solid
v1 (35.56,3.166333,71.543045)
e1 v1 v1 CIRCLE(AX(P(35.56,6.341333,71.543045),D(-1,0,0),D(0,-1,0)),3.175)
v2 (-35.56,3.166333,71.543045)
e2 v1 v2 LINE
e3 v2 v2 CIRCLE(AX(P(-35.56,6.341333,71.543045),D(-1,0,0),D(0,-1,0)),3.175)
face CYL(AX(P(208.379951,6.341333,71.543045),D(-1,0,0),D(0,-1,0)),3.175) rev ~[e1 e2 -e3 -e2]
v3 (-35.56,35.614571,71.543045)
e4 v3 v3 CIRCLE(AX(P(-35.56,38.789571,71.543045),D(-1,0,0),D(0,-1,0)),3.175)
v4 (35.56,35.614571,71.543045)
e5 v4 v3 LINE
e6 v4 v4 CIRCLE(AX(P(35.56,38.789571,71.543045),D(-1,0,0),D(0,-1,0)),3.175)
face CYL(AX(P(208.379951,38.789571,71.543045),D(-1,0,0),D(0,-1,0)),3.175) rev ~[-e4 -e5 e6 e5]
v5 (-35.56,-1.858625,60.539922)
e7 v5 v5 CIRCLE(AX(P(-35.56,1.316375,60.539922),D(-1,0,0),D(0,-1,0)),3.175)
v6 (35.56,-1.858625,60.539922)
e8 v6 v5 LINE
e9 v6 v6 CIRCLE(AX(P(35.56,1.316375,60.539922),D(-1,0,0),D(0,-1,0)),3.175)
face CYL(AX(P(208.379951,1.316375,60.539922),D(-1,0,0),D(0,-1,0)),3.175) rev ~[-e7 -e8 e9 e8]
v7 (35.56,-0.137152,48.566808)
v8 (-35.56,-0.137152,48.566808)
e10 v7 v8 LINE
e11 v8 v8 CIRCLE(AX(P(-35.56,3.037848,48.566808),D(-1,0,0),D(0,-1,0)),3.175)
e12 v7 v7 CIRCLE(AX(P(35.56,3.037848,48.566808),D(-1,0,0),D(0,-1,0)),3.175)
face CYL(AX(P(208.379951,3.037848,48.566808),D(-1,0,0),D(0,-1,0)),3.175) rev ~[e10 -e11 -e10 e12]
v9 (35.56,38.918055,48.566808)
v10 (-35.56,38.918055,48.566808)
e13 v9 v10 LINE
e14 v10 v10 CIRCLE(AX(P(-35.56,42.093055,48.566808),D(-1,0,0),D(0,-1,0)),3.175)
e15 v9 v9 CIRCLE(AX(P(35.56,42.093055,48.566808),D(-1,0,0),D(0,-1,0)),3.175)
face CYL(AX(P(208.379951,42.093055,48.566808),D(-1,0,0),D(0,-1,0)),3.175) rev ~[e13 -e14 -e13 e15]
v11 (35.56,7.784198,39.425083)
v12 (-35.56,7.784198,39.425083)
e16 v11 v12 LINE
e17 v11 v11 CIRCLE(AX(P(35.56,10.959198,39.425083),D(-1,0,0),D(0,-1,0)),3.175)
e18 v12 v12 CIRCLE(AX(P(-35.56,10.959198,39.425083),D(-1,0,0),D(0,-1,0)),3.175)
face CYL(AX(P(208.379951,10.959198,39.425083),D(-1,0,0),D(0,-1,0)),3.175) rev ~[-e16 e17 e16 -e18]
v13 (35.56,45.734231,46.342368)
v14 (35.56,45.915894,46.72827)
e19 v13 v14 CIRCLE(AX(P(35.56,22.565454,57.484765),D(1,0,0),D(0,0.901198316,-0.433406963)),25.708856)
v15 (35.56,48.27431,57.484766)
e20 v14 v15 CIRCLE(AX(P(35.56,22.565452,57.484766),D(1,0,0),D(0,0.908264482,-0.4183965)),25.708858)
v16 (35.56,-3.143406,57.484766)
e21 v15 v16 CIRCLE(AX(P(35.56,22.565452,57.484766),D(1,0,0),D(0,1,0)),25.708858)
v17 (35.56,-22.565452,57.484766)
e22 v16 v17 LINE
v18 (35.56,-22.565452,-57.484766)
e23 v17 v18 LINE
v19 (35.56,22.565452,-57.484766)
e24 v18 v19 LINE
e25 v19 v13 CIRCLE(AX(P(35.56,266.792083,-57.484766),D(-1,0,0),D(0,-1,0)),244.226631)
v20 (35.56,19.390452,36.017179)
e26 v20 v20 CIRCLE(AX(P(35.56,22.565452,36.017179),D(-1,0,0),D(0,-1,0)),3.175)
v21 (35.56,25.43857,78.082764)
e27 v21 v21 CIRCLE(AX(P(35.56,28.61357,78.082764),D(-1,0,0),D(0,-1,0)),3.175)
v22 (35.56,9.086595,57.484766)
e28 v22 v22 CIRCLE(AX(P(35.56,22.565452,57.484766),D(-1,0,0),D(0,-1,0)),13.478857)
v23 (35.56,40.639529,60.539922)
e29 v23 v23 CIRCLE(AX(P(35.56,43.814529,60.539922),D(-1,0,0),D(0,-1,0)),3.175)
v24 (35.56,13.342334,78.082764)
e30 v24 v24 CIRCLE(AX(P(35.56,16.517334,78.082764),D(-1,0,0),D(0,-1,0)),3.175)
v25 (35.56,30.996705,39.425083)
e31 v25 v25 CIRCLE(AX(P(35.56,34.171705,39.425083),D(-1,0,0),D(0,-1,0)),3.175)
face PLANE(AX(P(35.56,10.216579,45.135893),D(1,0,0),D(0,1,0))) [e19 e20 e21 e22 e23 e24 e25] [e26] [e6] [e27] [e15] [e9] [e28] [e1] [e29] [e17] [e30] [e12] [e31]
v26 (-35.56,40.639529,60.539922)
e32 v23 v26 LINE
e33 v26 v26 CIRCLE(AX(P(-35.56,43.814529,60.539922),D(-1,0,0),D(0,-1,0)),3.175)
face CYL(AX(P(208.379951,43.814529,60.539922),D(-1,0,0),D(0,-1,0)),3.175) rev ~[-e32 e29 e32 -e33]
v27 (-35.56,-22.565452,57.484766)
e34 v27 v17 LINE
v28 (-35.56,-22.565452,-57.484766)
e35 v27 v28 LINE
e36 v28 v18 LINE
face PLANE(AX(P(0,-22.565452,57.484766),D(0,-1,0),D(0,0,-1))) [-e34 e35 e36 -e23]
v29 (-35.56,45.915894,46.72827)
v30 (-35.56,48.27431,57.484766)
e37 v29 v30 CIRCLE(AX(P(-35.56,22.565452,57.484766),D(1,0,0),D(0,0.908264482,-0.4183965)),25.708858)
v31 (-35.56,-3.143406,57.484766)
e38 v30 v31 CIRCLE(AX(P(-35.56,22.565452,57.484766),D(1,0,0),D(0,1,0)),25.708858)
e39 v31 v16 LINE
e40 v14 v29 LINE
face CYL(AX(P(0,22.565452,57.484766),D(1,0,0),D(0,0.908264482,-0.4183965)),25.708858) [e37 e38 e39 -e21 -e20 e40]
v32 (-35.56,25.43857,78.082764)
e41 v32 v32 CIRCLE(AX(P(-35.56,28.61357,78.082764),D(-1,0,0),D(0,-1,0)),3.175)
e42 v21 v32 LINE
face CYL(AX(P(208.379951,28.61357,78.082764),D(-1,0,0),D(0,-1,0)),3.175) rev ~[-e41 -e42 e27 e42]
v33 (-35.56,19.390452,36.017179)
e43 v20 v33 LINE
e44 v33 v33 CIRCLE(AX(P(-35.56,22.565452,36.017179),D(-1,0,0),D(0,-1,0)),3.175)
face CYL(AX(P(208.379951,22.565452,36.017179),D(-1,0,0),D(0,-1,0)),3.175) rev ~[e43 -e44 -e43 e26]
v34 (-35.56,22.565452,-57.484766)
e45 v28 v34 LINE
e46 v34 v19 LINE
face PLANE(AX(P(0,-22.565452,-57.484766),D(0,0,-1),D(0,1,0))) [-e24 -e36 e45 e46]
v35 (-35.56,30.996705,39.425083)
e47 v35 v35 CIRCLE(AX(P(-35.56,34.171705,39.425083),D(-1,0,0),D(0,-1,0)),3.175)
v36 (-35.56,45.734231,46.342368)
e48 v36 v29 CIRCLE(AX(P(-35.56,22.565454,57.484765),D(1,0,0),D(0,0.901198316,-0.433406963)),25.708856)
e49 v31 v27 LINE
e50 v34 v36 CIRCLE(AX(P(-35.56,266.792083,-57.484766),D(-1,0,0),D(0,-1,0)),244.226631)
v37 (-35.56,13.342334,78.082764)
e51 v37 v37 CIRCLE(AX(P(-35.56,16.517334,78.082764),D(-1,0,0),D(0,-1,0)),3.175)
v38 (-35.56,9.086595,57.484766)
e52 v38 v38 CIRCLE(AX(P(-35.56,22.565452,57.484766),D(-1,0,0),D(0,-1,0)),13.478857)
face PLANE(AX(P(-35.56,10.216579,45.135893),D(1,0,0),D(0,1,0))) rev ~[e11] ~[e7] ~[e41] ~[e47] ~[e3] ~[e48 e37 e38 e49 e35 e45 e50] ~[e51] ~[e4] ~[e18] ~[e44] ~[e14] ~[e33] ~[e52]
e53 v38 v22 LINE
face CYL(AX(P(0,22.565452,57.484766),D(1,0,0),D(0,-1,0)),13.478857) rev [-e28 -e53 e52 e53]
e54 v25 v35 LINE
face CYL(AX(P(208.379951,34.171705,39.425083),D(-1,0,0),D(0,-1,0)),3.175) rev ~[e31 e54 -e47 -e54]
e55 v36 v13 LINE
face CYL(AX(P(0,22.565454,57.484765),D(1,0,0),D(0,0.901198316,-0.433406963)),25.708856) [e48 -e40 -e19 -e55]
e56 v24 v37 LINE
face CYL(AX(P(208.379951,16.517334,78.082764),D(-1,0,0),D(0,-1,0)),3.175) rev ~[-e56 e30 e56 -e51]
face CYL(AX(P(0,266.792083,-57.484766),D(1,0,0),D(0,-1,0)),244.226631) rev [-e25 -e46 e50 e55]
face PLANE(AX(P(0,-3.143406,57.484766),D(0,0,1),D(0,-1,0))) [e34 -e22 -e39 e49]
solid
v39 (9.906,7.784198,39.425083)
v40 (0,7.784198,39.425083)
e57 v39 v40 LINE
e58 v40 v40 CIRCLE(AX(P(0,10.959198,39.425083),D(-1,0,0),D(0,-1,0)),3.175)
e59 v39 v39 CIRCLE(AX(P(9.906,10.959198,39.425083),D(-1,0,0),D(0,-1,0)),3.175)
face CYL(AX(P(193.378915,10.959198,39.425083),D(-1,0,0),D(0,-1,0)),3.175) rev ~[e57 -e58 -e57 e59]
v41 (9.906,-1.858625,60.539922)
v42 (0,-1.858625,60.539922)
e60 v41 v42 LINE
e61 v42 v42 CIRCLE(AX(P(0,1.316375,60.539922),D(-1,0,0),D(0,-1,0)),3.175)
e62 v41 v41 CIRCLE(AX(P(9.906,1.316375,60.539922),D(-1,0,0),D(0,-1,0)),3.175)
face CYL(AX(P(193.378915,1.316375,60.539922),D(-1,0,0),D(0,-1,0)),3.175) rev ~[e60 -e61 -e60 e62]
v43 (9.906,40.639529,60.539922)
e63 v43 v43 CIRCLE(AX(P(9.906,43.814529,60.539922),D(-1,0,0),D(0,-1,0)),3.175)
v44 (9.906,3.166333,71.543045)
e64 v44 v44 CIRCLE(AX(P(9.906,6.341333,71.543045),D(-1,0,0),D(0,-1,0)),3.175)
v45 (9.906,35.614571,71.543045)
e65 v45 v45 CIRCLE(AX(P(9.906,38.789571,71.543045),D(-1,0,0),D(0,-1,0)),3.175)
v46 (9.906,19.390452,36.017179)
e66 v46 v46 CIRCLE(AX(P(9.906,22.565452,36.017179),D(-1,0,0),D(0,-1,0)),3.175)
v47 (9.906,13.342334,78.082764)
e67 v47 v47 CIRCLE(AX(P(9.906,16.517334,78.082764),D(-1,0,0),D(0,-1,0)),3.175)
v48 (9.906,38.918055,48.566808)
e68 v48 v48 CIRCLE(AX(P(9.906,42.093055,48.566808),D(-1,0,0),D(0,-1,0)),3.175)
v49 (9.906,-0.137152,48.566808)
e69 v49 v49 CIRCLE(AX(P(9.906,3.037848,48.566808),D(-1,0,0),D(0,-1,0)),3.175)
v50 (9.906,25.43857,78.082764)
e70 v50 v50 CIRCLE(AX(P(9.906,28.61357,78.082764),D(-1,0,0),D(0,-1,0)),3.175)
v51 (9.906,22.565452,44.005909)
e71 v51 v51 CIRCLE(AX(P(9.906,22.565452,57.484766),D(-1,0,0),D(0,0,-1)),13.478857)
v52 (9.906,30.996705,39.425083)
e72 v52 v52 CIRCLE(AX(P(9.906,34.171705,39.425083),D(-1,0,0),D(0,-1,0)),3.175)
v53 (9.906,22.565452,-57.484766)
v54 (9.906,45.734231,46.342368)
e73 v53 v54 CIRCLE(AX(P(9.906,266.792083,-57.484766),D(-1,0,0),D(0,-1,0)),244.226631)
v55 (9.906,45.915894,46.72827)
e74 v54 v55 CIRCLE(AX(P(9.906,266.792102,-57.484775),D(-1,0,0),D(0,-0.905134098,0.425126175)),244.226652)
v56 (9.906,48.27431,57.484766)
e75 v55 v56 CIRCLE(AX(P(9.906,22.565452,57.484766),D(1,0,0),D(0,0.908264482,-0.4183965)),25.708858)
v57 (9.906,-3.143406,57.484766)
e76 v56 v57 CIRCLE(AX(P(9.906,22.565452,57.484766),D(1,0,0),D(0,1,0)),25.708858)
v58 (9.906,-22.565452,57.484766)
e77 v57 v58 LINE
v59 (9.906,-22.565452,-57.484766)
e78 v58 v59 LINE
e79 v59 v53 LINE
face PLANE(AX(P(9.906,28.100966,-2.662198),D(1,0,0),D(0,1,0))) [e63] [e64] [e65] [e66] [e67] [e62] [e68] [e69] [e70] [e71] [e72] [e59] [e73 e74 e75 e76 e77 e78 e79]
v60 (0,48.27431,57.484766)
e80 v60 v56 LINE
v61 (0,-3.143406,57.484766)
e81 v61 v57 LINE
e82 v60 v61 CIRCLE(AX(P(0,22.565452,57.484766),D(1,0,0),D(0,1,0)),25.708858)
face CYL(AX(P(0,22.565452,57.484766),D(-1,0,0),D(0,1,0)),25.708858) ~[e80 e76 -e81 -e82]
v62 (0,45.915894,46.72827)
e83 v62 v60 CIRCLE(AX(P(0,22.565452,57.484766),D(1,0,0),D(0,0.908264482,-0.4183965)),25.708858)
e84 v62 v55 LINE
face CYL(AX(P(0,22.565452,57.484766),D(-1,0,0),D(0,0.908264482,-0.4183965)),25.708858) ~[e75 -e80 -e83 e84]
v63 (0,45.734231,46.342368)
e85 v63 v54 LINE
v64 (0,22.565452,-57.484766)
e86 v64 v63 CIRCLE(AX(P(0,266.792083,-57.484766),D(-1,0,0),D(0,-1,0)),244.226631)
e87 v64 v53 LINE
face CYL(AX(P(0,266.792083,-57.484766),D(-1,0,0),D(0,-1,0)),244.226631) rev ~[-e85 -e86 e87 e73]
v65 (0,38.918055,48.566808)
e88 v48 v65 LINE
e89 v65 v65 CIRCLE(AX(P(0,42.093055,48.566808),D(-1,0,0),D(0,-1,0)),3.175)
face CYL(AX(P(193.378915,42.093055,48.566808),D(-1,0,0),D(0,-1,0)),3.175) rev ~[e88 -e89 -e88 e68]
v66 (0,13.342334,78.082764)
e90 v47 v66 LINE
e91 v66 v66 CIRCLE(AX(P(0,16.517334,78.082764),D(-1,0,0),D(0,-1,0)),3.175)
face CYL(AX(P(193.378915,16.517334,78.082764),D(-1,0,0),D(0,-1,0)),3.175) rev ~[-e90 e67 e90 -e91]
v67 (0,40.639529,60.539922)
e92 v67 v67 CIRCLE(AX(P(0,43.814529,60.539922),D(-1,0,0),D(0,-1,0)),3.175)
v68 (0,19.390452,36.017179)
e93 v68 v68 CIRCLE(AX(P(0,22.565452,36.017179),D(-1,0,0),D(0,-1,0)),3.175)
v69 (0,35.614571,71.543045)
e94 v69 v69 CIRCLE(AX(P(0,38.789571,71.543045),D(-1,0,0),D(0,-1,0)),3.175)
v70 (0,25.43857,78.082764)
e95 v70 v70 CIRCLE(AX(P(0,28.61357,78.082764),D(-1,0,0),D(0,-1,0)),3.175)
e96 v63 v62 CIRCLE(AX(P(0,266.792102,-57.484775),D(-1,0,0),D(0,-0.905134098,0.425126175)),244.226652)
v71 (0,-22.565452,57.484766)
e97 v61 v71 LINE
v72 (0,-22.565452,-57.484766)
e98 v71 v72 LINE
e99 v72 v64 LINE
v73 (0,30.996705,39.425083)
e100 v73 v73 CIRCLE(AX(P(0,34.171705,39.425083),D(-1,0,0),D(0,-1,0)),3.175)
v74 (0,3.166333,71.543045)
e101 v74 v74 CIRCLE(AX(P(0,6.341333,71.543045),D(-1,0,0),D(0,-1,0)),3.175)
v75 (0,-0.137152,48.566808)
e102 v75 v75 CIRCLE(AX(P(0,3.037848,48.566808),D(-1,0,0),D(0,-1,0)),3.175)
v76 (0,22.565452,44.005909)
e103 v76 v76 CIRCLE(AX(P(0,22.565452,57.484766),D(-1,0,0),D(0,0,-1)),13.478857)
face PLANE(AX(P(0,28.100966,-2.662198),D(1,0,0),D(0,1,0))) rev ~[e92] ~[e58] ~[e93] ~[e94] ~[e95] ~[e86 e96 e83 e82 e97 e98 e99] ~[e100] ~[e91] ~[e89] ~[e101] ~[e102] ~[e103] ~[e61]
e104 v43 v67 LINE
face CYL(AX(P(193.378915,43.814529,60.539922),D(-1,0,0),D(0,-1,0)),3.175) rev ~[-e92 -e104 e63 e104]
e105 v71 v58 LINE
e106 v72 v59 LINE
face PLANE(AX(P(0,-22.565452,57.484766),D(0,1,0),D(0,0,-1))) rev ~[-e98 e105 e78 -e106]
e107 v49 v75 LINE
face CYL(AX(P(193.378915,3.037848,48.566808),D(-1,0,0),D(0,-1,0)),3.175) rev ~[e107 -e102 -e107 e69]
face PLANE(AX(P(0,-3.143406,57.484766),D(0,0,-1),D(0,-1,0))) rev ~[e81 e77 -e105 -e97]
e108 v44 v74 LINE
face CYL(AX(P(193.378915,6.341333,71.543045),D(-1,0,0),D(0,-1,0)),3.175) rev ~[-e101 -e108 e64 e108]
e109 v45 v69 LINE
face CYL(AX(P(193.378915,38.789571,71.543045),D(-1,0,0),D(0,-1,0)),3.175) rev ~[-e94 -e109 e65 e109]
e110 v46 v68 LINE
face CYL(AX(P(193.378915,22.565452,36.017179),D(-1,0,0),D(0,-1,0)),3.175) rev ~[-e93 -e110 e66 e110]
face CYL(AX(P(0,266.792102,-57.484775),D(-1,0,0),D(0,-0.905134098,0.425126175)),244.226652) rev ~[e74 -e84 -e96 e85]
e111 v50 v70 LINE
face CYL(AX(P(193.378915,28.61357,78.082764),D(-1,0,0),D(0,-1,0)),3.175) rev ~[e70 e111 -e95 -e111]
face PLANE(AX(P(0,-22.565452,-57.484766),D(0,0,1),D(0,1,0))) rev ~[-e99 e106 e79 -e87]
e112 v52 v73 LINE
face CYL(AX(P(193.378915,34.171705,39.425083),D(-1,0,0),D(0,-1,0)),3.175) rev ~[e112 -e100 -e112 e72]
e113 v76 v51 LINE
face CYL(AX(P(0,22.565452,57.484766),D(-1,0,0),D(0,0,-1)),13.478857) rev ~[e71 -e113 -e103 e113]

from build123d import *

# Parameters (mm, degrees)
F1_DEPTH = 9.906
F2_DEPTH = 35.56
F4_D     = 6.35
F4_2_D   = 6.35


# Not quite as in the source:
# - a feature of the source that left no trace in its solid (it failed there, or was rolled back) is left out


with BuildPart() as f1:
    # F0 (on Right) → F1 (new body)
    with BuildSketch(Plane.YZ):
        with BuildLine():
            ThreePointArc((45.734231444, 46.3423677323), (36.2491474566, 35.7200728964), (22.5654517973, 31.7759077207))
            Line((22.5654517973, 31.7759077207), (22.5654517973, -57.4847658439))
            ThreePointArc((22.5654517973, -57.4847658439), (28.4280108592, -4.2943860347), (45.734231444, 46.3423677323))
        make_face()
        with BuildLine():
            Line((-3.1434063259, 57.4847658439), (9.0865948156, 57.4847658439))
            ThreePointArc((9.0865948156, 57.4847658439), (22.5654517973, 70.9636228256), (36.044308779, 57.4847658439))
            ThreePointArc((36.044308779, 57.4847658439), (32.0964429717, 47.9537746695), (22.5654517973, 44.0059088622))
            Line((22.5654517973, 44.0059088622), (22.5654517973, 31.7759077207))
            ThreePointArc((22.5654517973, 31.7759077207), (36.2491474566, 35.7200728964), (45.734231444, 46.3423677323))
            ThreePointArc((45.734231444, 46.3423677323), (45.8249787247, 46.5353583121), (45.9158944923, 46.7282695768))
            ThreePointArc((45.9158944923, 46.7282695768), (47.6777854638, 51.9787615014), (48.2743099204, 57.4847658439))
            ThreePointArc((48.2743099204, 57.4847658439), (22.5654517973, 83.193623967), (-3.1434063259, 57.4847658439))
        make_face()
        with BuildLine():
            ThreePointArc((22.5654517973, 44.0059088622), (13.0344606229, 47.9537746695), (9.0865948156, 57.4847658439))
            Line((9.0865948156, 57.4847658439), (-3.1434063259, 57.4847658439))
            ThreePointArc((-3.1434063259, 57.4847658439), (4.3865438818, 39.3058579284), (22.5654517973, 31.7759077207))
            Line((22.5654517973, 31.7759077207), (22.5654517973, 44.0059088622))
        make_face()
        with BuildLine():
            ThreePointArc((22.5654517973, 31.7759077207), (4.3865438818, 39.3058579284), (-3.1434063259, 57.4847658439))
            Line((-3.1434063259, 57.4847658439), (-22.5654517973, 57.4847658439))
            Line((-22.5654517973, 57.4847658439), (-22.5654517973, -57.4847658439))
            Line((-22.5654517973, -57.4847658439), (22.5654517973, -57.4847658439))
            Line((22.5654517973, -57.4847658439), (22.5654517973, 31.7759077207))
        make_face()
    extrude(amount=F1_DEPTH)

    # F4 (through all)
    with Locations(Plane.YZ.offset(35.56)):
        with Locations((38.7895710473, 71.5430452002), (43.8145290766, 60.5399219241), (42.0930552086, 48.5668081792), (22.5654517973, 36.0171794891), (10.9591983617, 39.4250829816), (34.1717052329, 39.4250829816), (3.037848386, 48.5668081792), (1.3163745179, 60.5399219241), (6.3413325473, 71.5430452002), (16.5173338044, 78.0827641117), (28.6135697902, 78.0827641117)):
            Hole(F4_D / 2)


with BuildPart() as f2:
    # F0 (on Right) → F2 (new body, symmetric)
    with BuildSketch(Plane.YZ):
        with BuildLine():
            ThreePointArc((22.5654517973, 44.0059088622), (13.0344606229, 47.9537746695), (9.0865948156, 57.4847658439))
            Line((9.0865948156, 57.4847658439), (-3.1434063259, 57.4847658439))
            ThreePointArc((-3.1434063259, 57.4847658439), (4.3865438818, 39.3058579284), (22.5654517973, 31.7759077207))
            Line((22.5654517973, 31.7759077207), (22.5654517973, 44.0059088622))
        make_face()
        with BuildLine():
            Line((-3.1434063259, 57.4847658439), (9.0865948156, 57.4847658439))
            ThreePointArc((9.0865948156, 57.4847658439), (22.5654517973, 70.9636228256), (36.044308779, 57.4847658439))
            ThreePointArc((36.044308779, 57.4847658439), (32.0964429717, 47.9537746695), (22.5654517973, 44.0059088622))
            Line((22.5654517973, 44.0059088622), (22.5654517973, 31.7759077207))
            ThreePointArc((22.5654517973, 31.7759077207), (36.2491474566, 35.7200728964), (45.734231444, 46.3423677323))
            ThreePointArc((45.734231444, 46.3423677323), (45.8249787247, 46.5353583121), (45.9158944923, 46.7282695768))
            ThreePointArc((45.9158944923, 46.7282695768), (47.6777854638, 51.9787615014), (48.2743099204, 57.4847658439))
            ThreePointArc((48.2743099204, 57.4847658439), (22.5654517973, 83.193623967), (-3.1434063259, 57.4847658439))
        make_face()
        with BuildLine():
            ThreePointArc((22.5654517973, 31.7759077207), (4.3865438818, 39.3058579284), (-3.1434063259, 57.4847658439))
            Line((-3.1434063259, 57.4847658439), (-22.5654517973, 57.4847658439))
            Line((-22.5654517973, 57.4847658439), (-22.5654517973, -57.4847658439))
            Line((-22.5654517973, -57.4847658439), (22.5654517973, -57.4847658439))
            Line((22.5654517973, -57.4847658439), (22.5654517973, 31.7759077207))
        make_face()
        with BuildLine():
            ThreePointArc((45.734231444, 46.3423677323), (36.2491474566, 35.7200728964), (22.5654517973, 31.7759077207))
            Line((22.5654517973, 31.7759077207), (22.5654517973, -57.4847658439))
            ThreePointArc((22.5654517973, -57.4847658439), (28.4280108592, -4.2943860347), (45.734231444, 46.3423677323))
        make_face()
        with BuildLine():
            ThreePointArc((45.9158944923, 46.7282695768), (45.8249787247, 46.5353583121), (45.734231444, 46.3423677323))
            ThreePointArc((45.734231444, 46.3423677323), (45.82586327, 46.5349419129), (45.9158944923, 46.7282695768))
        make_face()
    extrude(amount=F2_DEPTH, both=True)

    # F4#2 (through all)
    with Locations(Plane.YZ.offset(35.56)):
        with Locations((38.7895710473, 71.5430452002), (43.8145290766, 60.5399219241), (42.0930552086, 48.5668081792), (22.5654517973, 36.0171794891), (10.9591983617, 39.4250829816), (34.1717052329, 39.4250829816), (3.037848386, 48.5668081792), (1.3163745179, 60.5399219241), (6.3413325473, 71.5430452002), (16.5173338044, 78.0827641117), (28.6135697902, 78.0827641117)):
            Hole(F4_2_D / 2)


solid = Compound([f1.part, f2.part])
